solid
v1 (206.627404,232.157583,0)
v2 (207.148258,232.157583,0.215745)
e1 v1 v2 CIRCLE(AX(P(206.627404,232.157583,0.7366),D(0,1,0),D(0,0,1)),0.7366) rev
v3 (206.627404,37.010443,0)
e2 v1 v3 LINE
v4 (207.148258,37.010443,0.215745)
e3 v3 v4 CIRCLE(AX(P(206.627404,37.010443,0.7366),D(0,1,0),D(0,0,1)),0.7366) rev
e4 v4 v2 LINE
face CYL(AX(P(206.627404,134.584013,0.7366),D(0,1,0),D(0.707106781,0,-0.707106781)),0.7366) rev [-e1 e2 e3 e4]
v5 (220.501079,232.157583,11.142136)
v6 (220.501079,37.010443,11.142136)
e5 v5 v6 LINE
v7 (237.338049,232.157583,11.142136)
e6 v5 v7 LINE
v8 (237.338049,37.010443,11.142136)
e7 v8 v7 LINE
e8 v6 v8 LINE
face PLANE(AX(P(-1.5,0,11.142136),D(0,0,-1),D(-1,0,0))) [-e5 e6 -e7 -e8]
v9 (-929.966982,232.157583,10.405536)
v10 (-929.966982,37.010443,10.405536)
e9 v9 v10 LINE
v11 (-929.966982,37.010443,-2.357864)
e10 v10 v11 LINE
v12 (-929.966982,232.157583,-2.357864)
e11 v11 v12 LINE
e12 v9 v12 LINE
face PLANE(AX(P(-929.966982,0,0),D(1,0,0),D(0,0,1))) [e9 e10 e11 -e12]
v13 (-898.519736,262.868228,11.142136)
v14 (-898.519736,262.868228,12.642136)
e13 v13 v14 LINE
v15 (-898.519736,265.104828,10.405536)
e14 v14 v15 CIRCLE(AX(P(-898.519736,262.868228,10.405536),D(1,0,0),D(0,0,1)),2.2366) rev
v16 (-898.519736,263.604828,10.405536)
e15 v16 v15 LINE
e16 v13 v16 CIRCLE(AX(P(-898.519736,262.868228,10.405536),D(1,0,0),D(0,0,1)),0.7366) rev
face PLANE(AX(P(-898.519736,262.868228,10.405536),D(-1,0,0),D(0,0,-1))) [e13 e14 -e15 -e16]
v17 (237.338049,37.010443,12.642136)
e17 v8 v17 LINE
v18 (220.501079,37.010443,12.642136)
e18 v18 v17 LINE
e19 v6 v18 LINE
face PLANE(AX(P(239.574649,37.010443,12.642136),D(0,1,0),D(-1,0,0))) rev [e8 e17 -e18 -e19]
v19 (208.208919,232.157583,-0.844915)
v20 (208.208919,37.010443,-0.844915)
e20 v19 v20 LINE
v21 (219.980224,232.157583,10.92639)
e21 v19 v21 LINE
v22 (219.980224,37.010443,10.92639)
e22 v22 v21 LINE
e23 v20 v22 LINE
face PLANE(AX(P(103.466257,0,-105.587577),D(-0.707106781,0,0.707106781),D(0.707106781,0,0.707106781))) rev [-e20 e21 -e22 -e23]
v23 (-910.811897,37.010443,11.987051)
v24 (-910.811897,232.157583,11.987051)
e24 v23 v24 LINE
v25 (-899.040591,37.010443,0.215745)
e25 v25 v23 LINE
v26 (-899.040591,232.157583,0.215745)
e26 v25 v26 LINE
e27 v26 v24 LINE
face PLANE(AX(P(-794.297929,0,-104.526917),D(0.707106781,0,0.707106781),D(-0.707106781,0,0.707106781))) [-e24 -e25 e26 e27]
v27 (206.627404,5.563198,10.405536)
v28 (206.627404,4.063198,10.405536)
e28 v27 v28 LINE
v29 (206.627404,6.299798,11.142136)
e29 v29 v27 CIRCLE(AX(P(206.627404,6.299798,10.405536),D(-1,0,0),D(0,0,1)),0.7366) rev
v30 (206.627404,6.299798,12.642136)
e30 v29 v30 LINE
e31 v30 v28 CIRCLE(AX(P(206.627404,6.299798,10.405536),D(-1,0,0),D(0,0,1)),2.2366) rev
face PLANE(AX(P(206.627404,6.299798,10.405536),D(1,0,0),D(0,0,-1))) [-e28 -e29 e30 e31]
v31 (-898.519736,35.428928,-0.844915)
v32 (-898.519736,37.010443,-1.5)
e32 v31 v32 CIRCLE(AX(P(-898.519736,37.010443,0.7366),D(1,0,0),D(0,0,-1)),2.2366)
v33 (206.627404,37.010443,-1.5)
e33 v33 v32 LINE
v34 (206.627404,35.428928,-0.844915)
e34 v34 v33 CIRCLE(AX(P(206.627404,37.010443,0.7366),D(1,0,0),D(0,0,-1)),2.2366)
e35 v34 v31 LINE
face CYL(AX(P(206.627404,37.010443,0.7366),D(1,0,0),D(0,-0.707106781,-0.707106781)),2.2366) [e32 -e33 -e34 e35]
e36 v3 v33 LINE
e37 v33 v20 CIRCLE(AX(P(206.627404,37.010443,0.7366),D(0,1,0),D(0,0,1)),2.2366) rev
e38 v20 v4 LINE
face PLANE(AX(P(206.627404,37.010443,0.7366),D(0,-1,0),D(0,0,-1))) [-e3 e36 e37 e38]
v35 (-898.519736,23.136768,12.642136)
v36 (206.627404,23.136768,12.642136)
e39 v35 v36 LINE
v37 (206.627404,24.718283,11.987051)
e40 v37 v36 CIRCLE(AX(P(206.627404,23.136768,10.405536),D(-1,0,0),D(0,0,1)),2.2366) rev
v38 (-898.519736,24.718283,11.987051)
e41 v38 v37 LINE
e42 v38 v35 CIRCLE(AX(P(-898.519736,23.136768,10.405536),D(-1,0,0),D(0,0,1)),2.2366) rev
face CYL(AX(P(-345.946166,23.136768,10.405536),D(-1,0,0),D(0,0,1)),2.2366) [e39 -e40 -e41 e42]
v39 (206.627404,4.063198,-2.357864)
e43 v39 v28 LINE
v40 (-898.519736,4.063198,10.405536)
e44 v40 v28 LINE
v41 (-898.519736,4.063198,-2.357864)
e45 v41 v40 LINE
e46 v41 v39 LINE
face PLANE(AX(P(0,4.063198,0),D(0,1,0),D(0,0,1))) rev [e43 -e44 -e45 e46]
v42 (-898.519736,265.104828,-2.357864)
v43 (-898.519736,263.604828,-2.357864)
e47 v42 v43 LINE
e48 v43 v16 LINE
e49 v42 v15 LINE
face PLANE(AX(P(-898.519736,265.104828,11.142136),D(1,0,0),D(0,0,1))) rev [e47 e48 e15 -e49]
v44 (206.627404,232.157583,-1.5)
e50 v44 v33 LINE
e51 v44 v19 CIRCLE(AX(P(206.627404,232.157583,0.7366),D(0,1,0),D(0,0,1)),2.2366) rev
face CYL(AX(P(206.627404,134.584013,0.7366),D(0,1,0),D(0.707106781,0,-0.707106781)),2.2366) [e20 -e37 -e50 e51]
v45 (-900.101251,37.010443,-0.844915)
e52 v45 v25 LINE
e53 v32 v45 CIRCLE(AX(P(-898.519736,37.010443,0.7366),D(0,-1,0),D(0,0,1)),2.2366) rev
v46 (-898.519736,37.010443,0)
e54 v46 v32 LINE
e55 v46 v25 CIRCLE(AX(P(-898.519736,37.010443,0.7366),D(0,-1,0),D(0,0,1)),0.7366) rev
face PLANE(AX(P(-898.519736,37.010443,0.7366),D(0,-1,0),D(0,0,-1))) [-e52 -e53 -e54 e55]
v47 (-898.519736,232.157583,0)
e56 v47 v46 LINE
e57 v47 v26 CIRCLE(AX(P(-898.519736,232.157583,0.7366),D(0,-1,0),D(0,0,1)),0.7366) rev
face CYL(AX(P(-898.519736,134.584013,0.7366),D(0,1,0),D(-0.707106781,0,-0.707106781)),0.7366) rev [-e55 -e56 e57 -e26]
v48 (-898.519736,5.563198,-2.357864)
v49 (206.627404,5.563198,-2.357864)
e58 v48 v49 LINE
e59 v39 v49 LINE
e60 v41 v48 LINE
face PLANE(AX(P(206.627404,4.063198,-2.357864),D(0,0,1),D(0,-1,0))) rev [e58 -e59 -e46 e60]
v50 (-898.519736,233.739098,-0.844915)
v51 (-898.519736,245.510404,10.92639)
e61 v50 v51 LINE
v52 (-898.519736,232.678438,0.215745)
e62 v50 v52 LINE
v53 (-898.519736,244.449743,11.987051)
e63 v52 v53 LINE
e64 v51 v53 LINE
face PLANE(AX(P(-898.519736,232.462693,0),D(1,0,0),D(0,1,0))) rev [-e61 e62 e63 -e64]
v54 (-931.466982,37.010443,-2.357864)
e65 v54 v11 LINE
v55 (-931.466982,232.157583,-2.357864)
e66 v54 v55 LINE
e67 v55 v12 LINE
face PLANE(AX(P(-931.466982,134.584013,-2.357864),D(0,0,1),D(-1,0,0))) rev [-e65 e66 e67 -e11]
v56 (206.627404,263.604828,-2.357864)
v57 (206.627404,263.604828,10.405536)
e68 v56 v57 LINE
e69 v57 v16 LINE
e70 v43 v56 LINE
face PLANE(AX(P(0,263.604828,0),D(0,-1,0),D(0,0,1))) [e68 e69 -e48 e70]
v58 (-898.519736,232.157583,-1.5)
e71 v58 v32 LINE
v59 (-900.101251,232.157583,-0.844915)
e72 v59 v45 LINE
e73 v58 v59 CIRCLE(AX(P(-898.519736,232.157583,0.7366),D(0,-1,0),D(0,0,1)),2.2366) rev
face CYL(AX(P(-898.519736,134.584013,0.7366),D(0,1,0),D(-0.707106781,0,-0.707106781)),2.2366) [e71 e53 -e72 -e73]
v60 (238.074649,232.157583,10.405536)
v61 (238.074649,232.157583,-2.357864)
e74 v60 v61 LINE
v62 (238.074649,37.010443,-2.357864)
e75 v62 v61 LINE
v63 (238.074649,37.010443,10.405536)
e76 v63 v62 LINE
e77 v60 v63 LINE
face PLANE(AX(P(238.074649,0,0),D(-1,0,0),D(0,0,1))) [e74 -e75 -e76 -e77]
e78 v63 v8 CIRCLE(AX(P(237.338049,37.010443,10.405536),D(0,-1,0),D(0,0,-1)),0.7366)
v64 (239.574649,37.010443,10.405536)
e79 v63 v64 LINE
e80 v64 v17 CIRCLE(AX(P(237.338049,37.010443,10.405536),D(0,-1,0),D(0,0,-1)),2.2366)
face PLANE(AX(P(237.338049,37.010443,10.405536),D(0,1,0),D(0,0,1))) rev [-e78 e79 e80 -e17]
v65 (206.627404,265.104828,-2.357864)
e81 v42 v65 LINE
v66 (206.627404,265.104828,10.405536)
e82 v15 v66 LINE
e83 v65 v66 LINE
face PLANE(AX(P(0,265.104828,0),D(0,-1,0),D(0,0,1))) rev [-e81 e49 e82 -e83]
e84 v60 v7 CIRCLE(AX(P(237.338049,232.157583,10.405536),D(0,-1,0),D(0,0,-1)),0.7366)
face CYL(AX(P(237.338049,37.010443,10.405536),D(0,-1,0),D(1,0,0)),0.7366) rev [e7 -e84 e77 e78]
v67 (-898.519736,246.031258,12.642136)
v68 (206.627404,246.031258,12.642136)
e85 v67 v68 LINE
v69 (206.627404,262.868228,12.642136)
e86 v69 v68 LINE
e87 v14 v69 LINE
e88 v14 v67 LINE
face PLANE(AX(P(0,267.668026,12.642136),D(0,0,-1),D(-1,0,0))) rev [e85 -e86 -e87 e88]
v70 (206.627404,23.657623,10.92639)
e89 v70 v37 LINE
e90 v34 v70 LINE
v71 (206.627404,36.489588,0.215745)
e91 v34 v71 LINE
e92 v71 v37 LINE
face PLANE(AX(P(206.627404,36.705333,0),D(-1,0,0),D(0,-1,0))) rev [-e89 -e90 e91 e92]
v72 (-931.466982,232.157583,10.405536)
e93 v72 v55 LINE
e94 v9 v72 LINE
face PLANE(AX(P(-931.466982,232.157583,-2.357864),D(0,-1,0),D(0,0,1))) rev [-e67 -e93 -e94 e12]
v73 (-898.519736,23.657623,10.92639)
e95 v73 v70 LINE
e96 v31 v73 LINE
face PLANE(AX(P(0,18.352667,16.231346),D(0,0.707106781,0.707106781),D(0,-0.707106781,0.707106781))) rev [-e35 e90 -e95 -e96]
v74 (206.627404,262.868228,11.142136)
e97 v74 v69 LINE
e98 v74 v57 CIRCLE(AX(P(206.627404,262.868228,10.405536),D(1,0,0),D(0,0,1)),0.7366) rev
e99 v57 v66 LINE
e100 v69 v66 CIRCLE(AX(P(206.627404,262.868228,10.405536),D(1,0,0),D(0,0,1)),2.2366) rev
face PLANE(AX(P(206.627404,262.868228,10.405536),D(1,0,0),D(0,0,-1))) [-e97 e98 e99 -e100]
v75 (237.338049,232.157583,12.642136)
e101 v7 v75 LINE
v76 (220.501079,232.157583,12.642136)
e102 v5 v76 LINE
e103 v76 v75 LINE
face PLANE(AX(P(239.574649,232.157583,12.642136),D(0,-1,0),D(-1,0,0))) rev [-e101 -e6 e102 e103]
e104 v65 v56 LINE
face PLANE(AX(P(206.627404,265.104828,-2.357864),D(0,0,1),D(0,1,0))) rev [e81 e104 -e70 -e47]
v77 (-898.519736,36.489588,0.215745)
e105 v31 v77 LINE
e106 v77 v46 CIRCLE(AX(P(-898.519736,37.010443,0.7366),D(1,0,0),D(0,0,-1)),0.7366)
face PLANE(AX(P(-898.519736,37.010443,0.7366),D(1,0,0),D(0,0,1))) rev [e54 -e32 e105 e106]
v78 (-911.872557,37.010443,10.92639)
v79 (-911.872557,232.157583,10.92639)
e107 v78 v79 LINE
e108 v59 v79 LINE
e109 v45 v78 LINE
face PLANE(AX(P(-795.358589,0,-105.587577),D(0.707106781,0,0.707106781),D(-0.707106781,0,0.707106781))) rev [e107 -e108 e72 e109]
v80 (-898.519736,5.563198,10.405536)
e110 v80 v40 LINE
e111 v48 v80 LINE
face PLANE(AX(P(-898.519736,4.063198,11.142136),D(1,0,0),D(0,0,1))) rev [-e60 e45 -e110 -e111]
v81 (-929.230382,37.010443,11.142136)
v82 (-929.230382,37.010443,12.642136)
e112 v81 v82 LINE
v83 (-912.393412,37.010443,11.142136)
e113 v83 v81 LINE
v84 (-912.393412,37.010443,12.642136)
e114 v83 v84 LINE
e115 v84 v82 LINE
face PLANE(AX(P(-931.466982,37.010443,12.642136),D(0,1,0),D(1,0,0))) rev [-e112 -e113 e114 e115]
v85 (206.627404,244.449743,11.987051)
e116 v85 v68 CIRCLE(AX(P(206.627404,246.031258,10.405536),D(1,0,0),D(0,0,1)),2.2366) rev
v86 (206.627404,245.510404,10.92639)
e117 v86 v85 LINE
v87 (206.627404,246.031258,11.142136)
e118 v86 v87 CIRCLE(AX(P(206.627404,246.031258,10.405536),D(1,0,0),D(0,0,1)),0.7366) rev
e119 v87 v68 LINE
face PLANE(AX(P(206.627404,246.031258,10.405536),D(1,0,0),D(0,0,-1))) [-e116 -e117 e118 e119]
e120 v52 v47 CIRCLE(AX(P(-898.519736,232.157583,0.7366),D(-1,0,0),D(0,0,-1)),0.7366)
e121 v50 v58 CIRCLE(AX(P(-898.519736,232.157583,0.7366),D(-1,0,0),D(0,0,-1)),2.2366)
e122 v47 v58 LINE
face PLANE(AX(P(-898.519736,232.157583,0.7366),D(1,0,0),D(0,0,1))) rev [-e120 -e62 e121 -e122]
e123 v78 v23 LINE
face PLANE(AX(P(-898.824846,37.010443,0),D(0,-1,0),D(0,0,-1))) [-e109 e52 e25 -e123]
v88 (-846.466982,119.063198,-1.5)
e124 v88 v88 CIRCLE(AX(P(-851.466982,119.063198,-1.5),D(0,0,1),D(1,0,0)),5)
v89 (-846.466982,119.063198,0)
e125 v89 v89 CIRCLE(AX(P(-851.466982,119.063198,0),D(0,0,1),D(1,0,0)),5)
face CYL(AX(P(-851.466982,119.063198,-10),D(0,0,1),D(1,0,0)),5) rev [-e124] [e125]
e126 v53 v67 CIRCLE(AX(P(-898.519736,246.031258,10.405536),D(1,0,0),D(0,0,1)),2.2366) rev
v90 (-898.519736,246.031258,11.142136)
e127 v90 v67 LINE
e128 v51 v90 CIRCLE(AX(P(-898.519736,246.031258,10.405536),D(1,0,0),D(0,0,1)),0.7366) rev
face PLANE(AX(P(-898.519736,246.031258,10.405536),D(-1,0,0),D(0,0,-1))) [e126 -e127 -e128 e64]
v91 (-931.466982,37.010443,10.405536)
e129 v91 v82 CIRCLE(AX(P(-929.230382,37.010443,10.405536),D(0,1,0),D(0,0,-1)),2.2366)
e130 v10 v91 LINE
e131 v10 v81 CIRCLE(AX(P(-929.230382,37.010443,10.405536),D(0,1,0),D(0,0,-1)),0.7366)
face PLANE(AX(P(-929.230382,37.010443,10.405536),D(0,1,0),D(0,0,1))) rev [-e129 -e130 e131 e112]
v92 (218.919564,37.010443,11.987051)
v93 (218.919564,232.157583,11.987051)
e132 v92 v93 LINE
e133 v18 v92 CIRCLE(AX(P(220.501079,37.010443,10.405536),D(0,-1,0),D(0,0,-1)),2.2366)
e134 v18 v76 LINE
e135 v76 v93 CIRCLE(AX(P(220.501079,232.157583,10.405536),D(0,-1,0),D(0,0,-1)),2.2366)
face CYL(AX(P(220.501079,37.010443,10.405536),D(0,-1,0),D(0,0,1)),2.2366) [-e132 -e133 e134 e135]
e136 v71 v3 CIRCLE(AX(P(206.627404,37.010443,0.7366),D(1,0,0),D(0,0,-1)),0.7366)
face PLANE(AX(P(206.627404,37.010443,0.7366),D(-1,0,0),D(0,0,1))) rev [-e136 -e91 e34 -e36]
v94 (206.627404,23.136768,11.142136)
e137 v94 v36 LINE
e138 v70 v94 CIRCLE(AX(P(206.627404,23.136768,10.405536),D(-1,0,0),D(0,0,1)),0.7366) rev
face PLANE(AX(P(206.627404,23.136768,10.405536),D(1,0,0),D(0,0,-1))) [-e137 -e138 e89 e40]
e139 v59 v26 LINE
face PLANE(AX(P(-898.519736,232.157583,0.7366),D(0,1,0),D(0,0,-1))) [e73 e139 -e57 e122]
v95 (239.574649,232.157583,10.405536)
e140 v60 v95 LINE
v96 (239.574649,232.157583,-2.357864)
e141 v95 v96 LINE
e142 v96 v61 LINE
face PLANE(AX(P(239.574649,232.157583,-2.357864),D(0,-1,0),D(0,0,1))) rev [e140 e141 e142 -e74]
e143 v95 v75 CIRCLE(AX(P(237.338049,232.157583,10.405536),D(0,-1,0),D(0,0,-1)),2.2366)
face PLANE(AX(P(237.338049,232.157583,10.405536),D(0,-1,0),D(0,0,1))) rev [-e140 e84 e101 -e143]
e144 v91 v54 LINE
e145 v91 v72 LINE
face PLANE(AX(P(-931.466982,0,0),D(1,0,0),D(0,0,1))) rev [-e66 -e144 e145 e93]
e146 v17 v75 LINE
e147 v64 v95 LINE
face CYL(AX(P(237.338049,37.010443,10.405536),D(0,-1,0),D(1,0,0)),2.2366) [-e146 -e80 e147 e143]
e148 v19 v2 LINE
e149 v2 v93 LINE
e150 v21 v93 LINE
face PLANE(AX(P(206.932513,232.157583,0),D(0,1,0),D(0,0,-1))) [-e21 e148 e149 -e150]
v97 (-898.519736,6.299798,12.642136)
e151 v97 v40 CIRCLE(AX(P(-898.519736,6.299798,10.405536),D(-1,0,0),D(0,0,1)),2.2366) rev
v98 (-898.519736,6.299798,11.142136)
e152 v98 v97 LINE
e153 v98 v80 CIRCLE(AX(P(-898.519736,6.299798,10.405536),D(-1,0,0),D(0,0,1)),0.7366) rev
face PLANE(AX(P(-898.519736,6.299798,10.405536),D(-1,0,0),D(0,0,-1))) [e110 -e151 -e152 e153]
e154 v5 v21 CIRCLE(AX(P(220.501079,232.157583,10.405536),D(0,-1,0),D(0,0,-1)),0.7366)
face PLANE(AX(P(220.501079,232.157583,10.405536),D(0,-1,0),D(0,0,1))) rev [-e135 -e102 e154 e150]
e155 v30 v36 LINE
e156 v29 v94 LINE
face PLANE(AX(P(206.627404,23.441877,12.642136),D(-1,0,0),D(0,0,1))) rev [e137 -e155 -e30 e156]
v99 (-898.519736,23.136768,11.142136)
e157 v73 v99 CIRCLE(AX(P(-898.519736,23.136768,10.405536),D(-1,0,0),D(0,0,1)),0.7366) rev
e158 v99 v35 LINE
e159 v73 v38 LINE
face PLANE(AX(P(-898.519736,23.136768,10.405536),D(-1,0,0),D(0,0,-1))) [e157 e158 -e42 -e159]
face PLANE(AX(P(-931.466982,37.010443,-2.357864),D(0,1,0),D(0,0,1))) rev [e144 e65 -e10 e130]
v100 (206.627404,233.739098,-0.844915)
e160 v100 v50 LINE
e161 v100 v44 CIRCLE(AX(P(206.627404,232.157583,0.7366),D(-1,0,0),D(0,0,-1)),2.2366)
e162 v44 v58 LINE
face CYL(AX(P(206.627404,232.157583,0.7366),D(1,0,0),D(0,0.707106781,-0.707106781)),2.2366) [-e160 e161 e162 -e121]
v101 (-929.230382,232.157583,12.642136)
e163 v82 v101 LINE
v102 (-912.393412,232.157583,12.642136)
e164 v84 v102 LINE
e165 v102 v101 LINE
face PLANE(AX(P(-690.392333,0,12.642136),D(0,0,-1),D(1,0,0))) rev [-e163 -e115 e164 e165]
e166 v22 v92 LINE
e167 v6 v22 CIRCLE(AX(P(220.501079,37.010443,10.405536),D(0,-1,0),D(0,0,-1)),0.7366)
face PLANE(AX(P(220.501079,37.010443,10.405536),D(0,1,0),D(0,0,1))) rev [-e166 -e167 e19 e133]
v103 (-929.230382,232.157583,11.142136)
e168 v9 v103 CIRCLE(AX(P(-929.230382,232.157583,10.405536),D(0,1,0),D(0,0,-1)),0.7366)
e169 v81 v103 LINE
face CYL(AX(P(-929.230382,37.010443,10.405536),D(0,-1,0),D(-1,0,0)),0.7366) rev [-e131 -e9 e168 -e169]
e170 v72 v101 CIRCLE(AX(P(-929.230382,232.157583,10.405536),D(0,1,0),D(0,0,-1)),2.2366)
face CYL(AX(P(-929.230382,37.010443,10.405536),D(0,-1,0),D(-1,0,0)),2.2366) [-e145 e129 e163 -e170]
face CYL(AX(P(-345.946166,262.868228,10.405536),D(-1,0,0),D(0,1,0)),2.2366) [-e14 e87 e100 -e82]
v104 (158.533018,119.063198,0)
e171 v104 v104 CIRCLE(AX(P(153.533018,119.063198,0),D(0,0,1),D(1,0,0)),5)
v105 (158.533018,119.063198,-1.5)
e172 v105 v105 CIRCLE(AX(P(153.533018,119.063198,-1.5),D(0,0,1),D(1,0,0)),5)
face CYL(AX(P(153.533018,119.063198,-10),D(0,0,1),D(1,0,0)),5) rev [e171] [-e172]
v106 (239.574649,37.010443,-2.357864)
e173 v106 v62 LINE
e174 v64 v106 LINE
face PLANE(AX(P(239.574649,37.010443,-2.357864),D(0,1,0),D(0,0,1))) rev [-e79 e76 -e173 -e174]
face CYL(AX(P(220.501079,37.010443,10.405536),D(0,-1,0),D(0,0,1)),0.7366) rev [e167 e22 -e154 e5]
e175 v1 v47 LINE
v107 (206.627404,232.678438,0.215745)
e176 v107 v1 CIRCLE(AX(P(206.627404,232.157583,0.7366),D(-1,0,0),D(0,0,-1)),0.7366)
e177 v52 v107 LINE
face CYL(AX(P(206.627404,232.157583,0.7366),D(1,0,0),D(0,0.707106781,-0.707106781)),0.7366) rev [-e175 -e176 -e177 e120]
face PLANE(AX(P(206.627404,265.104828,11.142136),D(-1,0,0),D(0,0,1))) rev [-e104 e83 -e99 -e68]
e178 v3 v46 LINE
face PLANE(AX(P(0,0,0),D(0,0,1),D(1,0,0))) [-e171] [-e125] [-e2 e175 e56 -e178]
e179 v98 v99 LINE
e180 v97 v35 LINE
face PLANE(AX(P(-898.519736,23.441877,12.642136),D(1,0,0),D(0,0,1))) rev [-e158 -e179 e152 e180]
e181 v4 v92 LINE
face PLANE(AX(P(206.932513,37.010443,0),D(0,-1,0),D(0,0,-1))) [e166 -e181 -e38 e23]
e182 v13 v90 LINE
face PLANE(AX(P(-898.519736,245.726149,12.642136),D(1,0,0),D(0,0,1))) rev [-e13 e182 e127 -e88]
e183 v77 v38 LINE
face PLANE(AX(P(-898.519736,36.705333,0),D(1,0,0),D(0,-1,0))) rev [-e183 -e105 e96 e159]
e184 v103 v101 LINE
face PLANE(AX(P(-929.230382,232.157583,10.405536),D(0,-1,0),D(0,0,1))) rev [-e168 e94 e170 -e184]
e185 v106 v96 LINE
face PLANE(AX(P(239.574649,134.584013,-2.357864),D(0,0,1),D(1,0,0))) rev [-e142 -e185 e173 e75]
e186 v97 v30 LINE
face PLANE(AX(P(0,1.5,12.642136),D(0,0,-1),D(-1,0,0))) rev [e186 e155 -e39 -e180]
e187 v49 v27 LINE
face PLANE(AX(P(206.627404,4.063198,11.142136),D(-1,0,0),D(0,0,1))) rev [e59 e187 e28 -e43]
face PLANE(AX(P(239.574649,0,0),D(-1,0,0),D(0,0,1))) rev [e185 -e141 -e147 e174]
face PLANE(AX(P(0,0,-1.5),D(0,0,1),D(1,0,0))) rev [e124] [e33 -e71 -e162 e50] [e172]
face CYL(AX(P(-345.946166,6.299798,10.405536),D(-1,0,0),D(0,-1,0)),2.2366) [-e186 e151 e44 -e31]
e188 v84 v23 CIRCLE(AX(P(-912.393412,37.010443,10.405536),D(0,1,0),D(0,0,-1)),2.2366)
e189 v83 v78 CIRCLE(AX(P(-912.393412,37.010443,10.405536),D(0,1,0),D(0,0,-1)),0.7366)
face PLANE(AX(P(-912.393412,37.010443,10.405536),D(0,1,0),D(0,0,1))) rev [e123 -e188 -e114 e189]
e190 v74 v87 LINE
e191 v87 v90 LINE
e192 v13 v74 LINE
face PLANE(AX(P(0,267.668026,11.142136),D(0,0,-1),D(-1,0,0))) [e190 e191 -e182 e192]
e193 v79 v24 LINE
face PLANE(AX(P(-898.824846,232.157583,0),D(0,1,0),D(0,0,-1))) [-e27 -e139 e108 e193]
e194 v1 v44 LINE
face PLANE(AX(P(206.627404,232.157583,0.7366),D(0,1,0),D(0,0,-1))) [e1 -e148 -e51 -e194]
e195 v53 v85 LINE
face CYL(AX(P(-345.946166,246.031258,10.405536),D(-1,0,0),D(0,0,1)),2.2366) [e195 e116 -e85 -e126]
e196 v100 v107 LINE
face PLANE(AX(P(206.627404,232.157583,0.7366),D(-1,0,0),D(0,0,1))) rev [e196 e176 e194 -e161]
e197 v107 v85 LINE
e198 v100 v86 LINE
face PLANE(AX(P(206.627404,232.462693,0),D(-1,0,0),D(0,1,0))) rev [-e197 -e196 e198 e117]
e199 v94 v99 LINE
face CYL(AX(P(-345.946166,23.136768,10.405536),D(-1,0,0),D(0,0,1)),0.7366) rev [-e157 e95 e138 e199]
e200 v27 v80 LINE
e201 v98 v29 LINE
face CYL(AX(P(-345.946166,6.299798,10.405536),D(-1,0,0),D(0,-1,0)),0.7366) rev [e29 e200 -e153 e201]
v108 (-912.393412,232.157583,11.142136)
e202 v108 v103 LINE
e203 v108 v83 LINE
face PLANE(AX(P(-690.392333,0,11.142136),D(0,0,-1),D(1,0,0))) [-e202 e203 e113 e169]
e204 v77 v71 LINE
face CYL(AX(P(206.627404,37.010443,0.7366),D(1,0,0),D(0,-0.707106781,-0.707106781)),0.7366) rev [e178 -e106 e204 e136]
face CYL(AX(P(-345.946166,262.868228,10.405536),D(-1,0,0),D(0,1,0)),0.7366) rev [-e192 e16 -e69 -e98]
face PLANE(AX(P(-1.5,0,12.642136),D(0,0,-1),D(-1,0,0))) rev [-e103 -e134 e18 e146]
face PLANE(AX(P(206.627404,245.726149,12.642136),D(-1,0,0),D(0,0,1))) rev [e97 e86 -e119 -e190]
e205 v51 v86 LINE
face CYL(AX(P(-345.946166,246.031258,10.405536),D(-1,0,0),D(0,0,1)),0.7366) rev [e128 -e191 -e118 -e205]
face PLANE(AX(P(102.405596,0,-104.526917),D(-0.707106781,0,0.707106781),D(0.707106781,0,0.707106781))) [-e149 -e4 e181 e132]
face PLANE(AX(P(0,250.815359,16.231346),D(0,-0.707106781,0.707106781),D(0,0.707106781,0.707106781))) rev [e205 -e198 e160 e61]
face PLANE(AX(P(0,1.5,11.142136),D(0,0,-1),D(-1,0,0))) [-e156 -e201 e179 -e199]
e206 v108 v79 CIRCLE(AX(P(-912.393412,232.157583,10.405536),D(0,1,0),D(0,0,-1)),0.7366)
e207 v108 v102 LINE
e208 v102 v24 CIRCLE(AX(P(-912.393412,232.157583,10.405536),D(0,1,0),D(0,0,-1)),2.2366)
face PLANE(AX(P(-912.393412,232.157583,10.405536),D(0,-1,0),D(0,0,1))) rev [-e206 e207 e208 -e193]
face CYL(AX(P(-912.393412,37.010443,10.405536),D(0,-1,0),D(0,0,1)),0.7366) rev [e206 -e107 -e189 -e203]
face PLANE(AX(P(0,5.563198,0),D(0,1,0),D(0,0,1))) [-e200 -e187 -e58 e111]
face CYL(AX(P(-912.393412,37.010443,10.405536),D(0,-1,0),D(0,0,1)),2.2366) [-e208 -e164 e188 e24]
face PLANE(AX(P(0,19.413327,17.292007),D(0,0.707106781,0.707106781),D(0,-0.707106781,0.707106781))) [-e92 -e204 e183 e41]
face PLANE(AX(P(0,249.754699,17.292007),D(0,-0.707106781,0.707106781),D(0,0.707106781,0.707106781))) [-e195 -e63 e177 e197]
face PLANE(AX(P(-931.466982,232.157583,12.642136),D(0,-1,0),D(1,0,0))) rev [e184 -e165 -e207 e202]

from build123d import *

# Parameters (mm, degrees)
SKETCH1_W                      = 555
SKETCH1_H                      = 100
BASE_FLANGE1_DEPTH             = 1.5
EDGE_FLANGE1_START             = 206.627403552
EDGE_FLANGE1_DEPTH             = 2.426430053
EDGE_FLANGE1_START_2           = -345.946166395
EDGE_FLANGE1_2_DEPTH           = 552.573569947
EDGE_FLANGE1_START_3           = 37.010443104
EDGE_FLANGE1_3_DEPTH           = 97.573569947
EDGE_FLANGE1_4_DEPTH           = 555.946166395
EDGE_FLANGE1_START_4           = 34
EDGE_FLANGE1_5_DEPTH           = 102
EDGE_FLANGE2_START             = 37.010443104
EDGE_FLANGE2_DEPTH             = 97.573569947
EDGE_FLANGE2_START_2           = -345.946166395
EDGE_FLANGE2_2_DEPTH           = 552.573569947
EDGE_FLANGE2_3_DEPTH           = 97.573569947
EDGE_FLANGE2_4_DEPTH           = 552.573569947
EDGE_FLANGE3_STRIP_W           = 7.4732
EDGE_FLANGE3_STRIP_H           = 1.5
EDGE_FLANGE3_STRIP_CUT_DEPTH   = 552.573569946
EDGE_FLANGE3_STRIP_2_W         = 7.4732
EDGE_FLANGE3_STRIP_2_H         = 1.5
EDGE_FLANGE3_STRIP_CUT_2_DEPTH = 97.573569946
EDGE_FLANGE3_DEPTH             = 552.573569946
EDGE_FLANGE3_BEND_DEPTH        = 97.573569946
SKETCH24_R                     = 5
CUT_EXTRUDE1_DEPTH             = 10
LPATTERN1_COUNT                = 2
LPATTERN1_PITCH                = 1005


with BuildPart() as part:
    # Base-Flange1: sheet metal written as solids
    # Sketch1 → Base-Flange1 (new body)
    with BuildSketch(Plane.XY):
        with Locations((-68.446166395, 84.584013051)):
            Rectangle(SKETCH1_W, SKETCH1_H)
    extrude(amount=-BASE_FLANGE1_DEPTH)

    # Edge-Flange1: read off the stored shape, not the designer's step
    # Edge-Flange1 outline → Edge-Flange1 (cut)
    with BuildSketch(Plane.YZ.offset(EDGE_FLANGE1_START)):
        with BuildLine():
            Line((21.941877427, 12.642135624), (35.428928077, -0.844915027))
            ThreePointArc((35.428928077, -0.844915027), (36.154533339, -1.329748962), (37.010443104, -1.5))
            Line((37.010443104, -1.5), (37.010443104, 0))
            ThreePointArc((37.010443104, 0), (36.728558488, 0.056070336), (36.489588249, 0.215745145))
            Line((36.489588249, 0.215745145), (23.002537599, 13.702795796))
            Line((23.002537599, 13.702795796), (21.941877427, 12.642135624))
        make_face()
    extrude(amount=EDGE_FLANGE1_DEPTH, mode=Mode.SUBTRACT)

    # Edge-Flange1 2 outline → Edge-Flange1 2 (add)
    with BuildSketch(Plane.YZ.offset(EDGE_FLANGE1_START_2)):
        with BuildLine():
            Line((21.941877427, 12.642135624), (35.428928077, -0.844915027))
            ThreePointArc((35.428928077, -0.844915027), (36.154533339, -1.329748962), (37.010443104, -1.5))
            Line((37.010443104, -1.5), (37.010443104, 0))
            ThreePointArc((37.010443104, 0), (36.728558488, 0.056070336), (36.489588249, 0.215745145))
            Line((36.489588249, 0.215745145), (23.002537599, 13.702795796))
            Line((23.002537599, 13.702795796), (21.941877427, 12.642135624))
        make_face()
    extrude(amount=EDGE_FLANGE1_2_DEPTH)

    # Edge-Flange1 3 outline → Edge-Flange1 3 (add)
    with BuildSketch(Plane(origin=(0, 0, 0), x_dir=(1, 0, 0), z_dir=(0, 1, 0)).offset(EDGE_FLANGE1_START_3)):
        with BuildLine():
            Line((221.695969229, -12.642135624), (209.053833605, 0))
            Line((209.053833605, 0), (206.627403552, 0))
            ThreePointArc((206.627403552, 0), (206.909288168, -0.056070336), (207.148258407, -0.215745145))
            Line((207.148258407, -0.215745145), (220.635309057, -13.702795796))
            Line((220.635309057, -13.702795796), (221.695969229, -12.642135624))
        make_face()
    extrude(amount=EDGE_FLANGE1_3_DEPTH)

    # Edge-Flange1 4 outline → Edge-Flange1 4 (cut)
    with BuildSketch(Plane.YZ.offset(EDGE_FLANGE1_START_2)):
        with BuildLine():
            ThreePointArc((37.010443104, -1.5), (36.154533339, -1.329748962), (35.428928077, -0.844915027))
            Line((35.428928077, -0.844915027), (34.58401305, 0))
            Line((34.58401305, 0), (34.584013051, -1.5))
            Line((34.584013051, -1.5), (37.010443104, -1.5))
        make_face()
    extrude(amount=EDGE_FLANGE1_4_DEPTH, mode=Mode.SUBTRACT)

    # Edge-Flange1 5 outline → Edge-Flange1 5 (cut)
    with BuildSketch(Plane(origin=(0, 0, 0), x_dir=(1, 0, 0), z_dir=(0, 1, 0)).offset(EDGE_FLANGE1_START_4)):
        with BuildLine():
            ThreePointArc((206.627403552, 1.5), (207.483313316, 1.329748962), (208.208918578, 0.844915027))
            Line((208.208918578, 0.844915027), (209.053833605, 0))
            Line((209.053833605, 0), (209.053833605, 1.5))
            Line((209.053833605, 1.5), (206.627403552, 1.5))
        make_face()
    extrude(amount=EDGE_FLANGE1_5_DEPTH, mode=Mode.SUBTRACT)

    # Edge-Flange2: read off the stored shape, not the designer's step
    # Edge-Flange2 outline → Edge-Flange2 (add)
    with BuildSketch(Plane(origin=(0, 0, 0), x_dir=(1, 0, 0), z_dir=(0, 1, 0)).offset(EDGE_FLANGE2_START)):
        with BuildLine():
            Line((221.695969229, -12.642135624), (239.574648885, -12.642135624))
            Line((239.574648885, -12.642135624), (239.574648885, -11.142135624))
            Line((239.574648885, -11.142135624), (220.501078939, -11.142135624))
            ThreePointArc((220.501078939, -11.142135624), (220.219194323, -11.086065287), (219.980224084, -10.926390479))
            Line((219.980224084, -10.926390479), (221.695969229, -12.642135624))
        make_face()
    extrude(amount=EDGE_FLANGE2_DEPTH)

    # Edge-Flange2 2 outline → Edge-Flange2 2 (add)
    with BuildSketch(Plane.YZ.offset(EDGE_FLANGE2_START_2)):
        with BuildLine():
            Line((23.657622572, 10.926390479), (21.941877427, 12.642135624))
            Line((21.941877427, 12.642135624), (4.06319777, 12.642135624))
            Line((4.06319777, 12.642135624), (4.06319777, 11.142135624))
            Line((4.06319777, 11.142135624), (23.136767717, 11.142135624))
            ThreePointArc((23.136767717, 11.142135624), (23.418652333, 11.086065287), (23.657622572, 10.926390479))
        make_face()
    extrude(amount=EDGE_FLANGE2_2_DEPTH)

    # Edge-Flange2 3 outline → Edge-Flange2 3 (cut)
    with BuildSketch(Plane(origin=(0, 0, 0), x_dir=(1, 0, 0), z_dir=(0, 1, 0)).offset(EDGE_FLANGE2_START)):
        with BuildLine():
            Line((220.635309057, -13.702795796), (221.695969229, -12.642135624))
            Line((221.695969229, -12.642135624), (220.501078939, -12.642135624))
            ThreePointArc((220.501078939, -12.642135624), (219.645169174, -12.471884586), (218.919563912, -11.987050651))
            Line((218.919563912, -11.987050651), (220.635309057, -13.702795796))
        make_face()
    extrude(amount=EDGE_FLANGE2_3_DEPTH, mode=Mode.SUBTRACT)

    # Edge-Flange2 4 outline → Edge-Flange2 4 (cut)
    with BuildSketch(Plane.YZ.offset(EDGE_FLANGE2_START_2)):
        with BuildLine():
            Line((21.941877427, 12.642135624), (23.136767717, 12.642135624))
            ThreePointArc((23.136767717, 12.642135624), (23.992677482, 12.471884586), (24.718282744, 11.987050651))
            Line((24.718282744, 11.987050651), (23.002537599, 13.702795796))
            Line((23.002537599, 13.702795796), (21.941877427, 12.642135624))
        make_face()
    extrude(amount=EDGE_FLANGE2_4_DEPTH, mode=Mode.SUBTRACT)

    # Edge-Flange3: sheet metal written as solids
    # Edge-Flange3 strip (on a plane across the edge) → Edge-Flange3 strip cut (cut)
    with BuildSketch(Plane(origin=(206.627403552, 4.06319777, 11.142135624), x_dir=(0, 1, 0), z_dir=(-1, 0, 0))):
        with Locations((-1.5, -0.75)):
            Rectangle(EDGE_FLANGE3_STRIP_W, EDGE_FLANGE3_STRIP_H)
    extrude(amount=EDGE_FLANGE3_STRIP_CUT_DEPTH, mode=Mode.SUBTRACT)

    # Edge-Flange3 strip 2 (on a plane across the edge) → Edge-Flange3 strip cut 2 (cut)
    with BuildSketch(Plane(origin=(239.574648885, 134.584013051, 11.142135624), x_dir=(-1, 0, 0), z_dir=(0, -1, 0))):
        with Locations((-1.5, -0.75)):
            Rectangle(EDGE_FLANGE3_STRIP_2_W, EDGE_FLANGE3_STRIP_2_H)
    extrude(amount=EDGE_FLANGE3_STRIP_CUT_2_DEPTH, mode=Mode.SUBTRACT)

    # Edge-Flange3 section (on a plane across the edge) → Edge-Flange3 (add)
    with BuildSketch(Plane(origin=(206.627403552, 4.06319777, 11.142135624), x_dir=(0, 1, 0), z_dir=(-1, 0, 0))):
        with BuildLine():
            Line((0, 0.7366), (0, 13.5))
            Line((0, 13.5), (1.5, 13.5))
            Line((1.5, 13.5), (1.5, 0.7366))
            ThreePointArc((1.5, 0.7366), (1.715745145, 0.215745145), (2.2366, 0))
            Line((2.2366, 0), (2.2366, -1.5))
            ThreePointArc((2.2366, -1.5), (0.655084973, -0.844915027), (0, 0.7366))
        make_face()
    extrude(amount=EDGE_FLANGE3_DEPTH)

    # Edge-Flange3 section 2 (on a plane across the edge) → Edge-Flange3 bend (add)
    with BuildSketch(Plane(origin=(239.574648885, 134.584013051, 11.142135624), x_dir=(-1, 0, 0), z_dir=(0, -1, 0))):
        with BuildLine():
            Line((0, 0.7366), (0, 13.5))
            Line((0, 13.5), (1.5, 13.5))
            Line((1.5, 13.5), (1.5, 0.7366))
            ThreePointArc((1.5, 0.7366), (1.715745145, 0.215745145), (2.2366, 0))
            Line((2.2366, 0), (2.2366, -1.5))
            ThreePointArc((2.2366, -1.5), (0.655084973, -0.844915027), (0, 0.7366))
        make_face()
    extrude(amount=EDGE_FLANGE3_BEND_DEPTH)

    # Mirror1: part across plane


with BuildPart() as part_1:
    add(part.part)
    add(part.part.mirror(Plane(origin=(-345.946166395, 134.584013051, -1.5), x_dir=(0, 0, 1), z_dir=(-1, 0, 0))))

    # Mirror2: part across plane


with BuildPart() as part_2:
    add(part_1.part)
    add(part_1.part.mirror(Plane(origin=(-345.946166395, 134.584013051, -1.5), x_dir=(0, 0, 1), z_dir=(0, 1, 0))))

    # Sketch24 → Cut-Extrude1 (cut)
    with BuildSketch(Plane.XY):
        with Locations((-851.466981675, 119.06319777)):
            Circle(SKETCH24_R)
    cut_extrude1 = extrude(amount=-CUT_EXTRUDE1_DEPTH, mode=Mode.SUBTRACT)

    # LPattern1: Cut-Extrude1 ×2
    with Locations(*[(i * LPATTERN1_PITCH, 0, 0) for i in range(1, LPATTERN1_COUNT)]):
        add(cut_extrude1, mode=Mode.SUBTRACT)


solid = part_2.part
